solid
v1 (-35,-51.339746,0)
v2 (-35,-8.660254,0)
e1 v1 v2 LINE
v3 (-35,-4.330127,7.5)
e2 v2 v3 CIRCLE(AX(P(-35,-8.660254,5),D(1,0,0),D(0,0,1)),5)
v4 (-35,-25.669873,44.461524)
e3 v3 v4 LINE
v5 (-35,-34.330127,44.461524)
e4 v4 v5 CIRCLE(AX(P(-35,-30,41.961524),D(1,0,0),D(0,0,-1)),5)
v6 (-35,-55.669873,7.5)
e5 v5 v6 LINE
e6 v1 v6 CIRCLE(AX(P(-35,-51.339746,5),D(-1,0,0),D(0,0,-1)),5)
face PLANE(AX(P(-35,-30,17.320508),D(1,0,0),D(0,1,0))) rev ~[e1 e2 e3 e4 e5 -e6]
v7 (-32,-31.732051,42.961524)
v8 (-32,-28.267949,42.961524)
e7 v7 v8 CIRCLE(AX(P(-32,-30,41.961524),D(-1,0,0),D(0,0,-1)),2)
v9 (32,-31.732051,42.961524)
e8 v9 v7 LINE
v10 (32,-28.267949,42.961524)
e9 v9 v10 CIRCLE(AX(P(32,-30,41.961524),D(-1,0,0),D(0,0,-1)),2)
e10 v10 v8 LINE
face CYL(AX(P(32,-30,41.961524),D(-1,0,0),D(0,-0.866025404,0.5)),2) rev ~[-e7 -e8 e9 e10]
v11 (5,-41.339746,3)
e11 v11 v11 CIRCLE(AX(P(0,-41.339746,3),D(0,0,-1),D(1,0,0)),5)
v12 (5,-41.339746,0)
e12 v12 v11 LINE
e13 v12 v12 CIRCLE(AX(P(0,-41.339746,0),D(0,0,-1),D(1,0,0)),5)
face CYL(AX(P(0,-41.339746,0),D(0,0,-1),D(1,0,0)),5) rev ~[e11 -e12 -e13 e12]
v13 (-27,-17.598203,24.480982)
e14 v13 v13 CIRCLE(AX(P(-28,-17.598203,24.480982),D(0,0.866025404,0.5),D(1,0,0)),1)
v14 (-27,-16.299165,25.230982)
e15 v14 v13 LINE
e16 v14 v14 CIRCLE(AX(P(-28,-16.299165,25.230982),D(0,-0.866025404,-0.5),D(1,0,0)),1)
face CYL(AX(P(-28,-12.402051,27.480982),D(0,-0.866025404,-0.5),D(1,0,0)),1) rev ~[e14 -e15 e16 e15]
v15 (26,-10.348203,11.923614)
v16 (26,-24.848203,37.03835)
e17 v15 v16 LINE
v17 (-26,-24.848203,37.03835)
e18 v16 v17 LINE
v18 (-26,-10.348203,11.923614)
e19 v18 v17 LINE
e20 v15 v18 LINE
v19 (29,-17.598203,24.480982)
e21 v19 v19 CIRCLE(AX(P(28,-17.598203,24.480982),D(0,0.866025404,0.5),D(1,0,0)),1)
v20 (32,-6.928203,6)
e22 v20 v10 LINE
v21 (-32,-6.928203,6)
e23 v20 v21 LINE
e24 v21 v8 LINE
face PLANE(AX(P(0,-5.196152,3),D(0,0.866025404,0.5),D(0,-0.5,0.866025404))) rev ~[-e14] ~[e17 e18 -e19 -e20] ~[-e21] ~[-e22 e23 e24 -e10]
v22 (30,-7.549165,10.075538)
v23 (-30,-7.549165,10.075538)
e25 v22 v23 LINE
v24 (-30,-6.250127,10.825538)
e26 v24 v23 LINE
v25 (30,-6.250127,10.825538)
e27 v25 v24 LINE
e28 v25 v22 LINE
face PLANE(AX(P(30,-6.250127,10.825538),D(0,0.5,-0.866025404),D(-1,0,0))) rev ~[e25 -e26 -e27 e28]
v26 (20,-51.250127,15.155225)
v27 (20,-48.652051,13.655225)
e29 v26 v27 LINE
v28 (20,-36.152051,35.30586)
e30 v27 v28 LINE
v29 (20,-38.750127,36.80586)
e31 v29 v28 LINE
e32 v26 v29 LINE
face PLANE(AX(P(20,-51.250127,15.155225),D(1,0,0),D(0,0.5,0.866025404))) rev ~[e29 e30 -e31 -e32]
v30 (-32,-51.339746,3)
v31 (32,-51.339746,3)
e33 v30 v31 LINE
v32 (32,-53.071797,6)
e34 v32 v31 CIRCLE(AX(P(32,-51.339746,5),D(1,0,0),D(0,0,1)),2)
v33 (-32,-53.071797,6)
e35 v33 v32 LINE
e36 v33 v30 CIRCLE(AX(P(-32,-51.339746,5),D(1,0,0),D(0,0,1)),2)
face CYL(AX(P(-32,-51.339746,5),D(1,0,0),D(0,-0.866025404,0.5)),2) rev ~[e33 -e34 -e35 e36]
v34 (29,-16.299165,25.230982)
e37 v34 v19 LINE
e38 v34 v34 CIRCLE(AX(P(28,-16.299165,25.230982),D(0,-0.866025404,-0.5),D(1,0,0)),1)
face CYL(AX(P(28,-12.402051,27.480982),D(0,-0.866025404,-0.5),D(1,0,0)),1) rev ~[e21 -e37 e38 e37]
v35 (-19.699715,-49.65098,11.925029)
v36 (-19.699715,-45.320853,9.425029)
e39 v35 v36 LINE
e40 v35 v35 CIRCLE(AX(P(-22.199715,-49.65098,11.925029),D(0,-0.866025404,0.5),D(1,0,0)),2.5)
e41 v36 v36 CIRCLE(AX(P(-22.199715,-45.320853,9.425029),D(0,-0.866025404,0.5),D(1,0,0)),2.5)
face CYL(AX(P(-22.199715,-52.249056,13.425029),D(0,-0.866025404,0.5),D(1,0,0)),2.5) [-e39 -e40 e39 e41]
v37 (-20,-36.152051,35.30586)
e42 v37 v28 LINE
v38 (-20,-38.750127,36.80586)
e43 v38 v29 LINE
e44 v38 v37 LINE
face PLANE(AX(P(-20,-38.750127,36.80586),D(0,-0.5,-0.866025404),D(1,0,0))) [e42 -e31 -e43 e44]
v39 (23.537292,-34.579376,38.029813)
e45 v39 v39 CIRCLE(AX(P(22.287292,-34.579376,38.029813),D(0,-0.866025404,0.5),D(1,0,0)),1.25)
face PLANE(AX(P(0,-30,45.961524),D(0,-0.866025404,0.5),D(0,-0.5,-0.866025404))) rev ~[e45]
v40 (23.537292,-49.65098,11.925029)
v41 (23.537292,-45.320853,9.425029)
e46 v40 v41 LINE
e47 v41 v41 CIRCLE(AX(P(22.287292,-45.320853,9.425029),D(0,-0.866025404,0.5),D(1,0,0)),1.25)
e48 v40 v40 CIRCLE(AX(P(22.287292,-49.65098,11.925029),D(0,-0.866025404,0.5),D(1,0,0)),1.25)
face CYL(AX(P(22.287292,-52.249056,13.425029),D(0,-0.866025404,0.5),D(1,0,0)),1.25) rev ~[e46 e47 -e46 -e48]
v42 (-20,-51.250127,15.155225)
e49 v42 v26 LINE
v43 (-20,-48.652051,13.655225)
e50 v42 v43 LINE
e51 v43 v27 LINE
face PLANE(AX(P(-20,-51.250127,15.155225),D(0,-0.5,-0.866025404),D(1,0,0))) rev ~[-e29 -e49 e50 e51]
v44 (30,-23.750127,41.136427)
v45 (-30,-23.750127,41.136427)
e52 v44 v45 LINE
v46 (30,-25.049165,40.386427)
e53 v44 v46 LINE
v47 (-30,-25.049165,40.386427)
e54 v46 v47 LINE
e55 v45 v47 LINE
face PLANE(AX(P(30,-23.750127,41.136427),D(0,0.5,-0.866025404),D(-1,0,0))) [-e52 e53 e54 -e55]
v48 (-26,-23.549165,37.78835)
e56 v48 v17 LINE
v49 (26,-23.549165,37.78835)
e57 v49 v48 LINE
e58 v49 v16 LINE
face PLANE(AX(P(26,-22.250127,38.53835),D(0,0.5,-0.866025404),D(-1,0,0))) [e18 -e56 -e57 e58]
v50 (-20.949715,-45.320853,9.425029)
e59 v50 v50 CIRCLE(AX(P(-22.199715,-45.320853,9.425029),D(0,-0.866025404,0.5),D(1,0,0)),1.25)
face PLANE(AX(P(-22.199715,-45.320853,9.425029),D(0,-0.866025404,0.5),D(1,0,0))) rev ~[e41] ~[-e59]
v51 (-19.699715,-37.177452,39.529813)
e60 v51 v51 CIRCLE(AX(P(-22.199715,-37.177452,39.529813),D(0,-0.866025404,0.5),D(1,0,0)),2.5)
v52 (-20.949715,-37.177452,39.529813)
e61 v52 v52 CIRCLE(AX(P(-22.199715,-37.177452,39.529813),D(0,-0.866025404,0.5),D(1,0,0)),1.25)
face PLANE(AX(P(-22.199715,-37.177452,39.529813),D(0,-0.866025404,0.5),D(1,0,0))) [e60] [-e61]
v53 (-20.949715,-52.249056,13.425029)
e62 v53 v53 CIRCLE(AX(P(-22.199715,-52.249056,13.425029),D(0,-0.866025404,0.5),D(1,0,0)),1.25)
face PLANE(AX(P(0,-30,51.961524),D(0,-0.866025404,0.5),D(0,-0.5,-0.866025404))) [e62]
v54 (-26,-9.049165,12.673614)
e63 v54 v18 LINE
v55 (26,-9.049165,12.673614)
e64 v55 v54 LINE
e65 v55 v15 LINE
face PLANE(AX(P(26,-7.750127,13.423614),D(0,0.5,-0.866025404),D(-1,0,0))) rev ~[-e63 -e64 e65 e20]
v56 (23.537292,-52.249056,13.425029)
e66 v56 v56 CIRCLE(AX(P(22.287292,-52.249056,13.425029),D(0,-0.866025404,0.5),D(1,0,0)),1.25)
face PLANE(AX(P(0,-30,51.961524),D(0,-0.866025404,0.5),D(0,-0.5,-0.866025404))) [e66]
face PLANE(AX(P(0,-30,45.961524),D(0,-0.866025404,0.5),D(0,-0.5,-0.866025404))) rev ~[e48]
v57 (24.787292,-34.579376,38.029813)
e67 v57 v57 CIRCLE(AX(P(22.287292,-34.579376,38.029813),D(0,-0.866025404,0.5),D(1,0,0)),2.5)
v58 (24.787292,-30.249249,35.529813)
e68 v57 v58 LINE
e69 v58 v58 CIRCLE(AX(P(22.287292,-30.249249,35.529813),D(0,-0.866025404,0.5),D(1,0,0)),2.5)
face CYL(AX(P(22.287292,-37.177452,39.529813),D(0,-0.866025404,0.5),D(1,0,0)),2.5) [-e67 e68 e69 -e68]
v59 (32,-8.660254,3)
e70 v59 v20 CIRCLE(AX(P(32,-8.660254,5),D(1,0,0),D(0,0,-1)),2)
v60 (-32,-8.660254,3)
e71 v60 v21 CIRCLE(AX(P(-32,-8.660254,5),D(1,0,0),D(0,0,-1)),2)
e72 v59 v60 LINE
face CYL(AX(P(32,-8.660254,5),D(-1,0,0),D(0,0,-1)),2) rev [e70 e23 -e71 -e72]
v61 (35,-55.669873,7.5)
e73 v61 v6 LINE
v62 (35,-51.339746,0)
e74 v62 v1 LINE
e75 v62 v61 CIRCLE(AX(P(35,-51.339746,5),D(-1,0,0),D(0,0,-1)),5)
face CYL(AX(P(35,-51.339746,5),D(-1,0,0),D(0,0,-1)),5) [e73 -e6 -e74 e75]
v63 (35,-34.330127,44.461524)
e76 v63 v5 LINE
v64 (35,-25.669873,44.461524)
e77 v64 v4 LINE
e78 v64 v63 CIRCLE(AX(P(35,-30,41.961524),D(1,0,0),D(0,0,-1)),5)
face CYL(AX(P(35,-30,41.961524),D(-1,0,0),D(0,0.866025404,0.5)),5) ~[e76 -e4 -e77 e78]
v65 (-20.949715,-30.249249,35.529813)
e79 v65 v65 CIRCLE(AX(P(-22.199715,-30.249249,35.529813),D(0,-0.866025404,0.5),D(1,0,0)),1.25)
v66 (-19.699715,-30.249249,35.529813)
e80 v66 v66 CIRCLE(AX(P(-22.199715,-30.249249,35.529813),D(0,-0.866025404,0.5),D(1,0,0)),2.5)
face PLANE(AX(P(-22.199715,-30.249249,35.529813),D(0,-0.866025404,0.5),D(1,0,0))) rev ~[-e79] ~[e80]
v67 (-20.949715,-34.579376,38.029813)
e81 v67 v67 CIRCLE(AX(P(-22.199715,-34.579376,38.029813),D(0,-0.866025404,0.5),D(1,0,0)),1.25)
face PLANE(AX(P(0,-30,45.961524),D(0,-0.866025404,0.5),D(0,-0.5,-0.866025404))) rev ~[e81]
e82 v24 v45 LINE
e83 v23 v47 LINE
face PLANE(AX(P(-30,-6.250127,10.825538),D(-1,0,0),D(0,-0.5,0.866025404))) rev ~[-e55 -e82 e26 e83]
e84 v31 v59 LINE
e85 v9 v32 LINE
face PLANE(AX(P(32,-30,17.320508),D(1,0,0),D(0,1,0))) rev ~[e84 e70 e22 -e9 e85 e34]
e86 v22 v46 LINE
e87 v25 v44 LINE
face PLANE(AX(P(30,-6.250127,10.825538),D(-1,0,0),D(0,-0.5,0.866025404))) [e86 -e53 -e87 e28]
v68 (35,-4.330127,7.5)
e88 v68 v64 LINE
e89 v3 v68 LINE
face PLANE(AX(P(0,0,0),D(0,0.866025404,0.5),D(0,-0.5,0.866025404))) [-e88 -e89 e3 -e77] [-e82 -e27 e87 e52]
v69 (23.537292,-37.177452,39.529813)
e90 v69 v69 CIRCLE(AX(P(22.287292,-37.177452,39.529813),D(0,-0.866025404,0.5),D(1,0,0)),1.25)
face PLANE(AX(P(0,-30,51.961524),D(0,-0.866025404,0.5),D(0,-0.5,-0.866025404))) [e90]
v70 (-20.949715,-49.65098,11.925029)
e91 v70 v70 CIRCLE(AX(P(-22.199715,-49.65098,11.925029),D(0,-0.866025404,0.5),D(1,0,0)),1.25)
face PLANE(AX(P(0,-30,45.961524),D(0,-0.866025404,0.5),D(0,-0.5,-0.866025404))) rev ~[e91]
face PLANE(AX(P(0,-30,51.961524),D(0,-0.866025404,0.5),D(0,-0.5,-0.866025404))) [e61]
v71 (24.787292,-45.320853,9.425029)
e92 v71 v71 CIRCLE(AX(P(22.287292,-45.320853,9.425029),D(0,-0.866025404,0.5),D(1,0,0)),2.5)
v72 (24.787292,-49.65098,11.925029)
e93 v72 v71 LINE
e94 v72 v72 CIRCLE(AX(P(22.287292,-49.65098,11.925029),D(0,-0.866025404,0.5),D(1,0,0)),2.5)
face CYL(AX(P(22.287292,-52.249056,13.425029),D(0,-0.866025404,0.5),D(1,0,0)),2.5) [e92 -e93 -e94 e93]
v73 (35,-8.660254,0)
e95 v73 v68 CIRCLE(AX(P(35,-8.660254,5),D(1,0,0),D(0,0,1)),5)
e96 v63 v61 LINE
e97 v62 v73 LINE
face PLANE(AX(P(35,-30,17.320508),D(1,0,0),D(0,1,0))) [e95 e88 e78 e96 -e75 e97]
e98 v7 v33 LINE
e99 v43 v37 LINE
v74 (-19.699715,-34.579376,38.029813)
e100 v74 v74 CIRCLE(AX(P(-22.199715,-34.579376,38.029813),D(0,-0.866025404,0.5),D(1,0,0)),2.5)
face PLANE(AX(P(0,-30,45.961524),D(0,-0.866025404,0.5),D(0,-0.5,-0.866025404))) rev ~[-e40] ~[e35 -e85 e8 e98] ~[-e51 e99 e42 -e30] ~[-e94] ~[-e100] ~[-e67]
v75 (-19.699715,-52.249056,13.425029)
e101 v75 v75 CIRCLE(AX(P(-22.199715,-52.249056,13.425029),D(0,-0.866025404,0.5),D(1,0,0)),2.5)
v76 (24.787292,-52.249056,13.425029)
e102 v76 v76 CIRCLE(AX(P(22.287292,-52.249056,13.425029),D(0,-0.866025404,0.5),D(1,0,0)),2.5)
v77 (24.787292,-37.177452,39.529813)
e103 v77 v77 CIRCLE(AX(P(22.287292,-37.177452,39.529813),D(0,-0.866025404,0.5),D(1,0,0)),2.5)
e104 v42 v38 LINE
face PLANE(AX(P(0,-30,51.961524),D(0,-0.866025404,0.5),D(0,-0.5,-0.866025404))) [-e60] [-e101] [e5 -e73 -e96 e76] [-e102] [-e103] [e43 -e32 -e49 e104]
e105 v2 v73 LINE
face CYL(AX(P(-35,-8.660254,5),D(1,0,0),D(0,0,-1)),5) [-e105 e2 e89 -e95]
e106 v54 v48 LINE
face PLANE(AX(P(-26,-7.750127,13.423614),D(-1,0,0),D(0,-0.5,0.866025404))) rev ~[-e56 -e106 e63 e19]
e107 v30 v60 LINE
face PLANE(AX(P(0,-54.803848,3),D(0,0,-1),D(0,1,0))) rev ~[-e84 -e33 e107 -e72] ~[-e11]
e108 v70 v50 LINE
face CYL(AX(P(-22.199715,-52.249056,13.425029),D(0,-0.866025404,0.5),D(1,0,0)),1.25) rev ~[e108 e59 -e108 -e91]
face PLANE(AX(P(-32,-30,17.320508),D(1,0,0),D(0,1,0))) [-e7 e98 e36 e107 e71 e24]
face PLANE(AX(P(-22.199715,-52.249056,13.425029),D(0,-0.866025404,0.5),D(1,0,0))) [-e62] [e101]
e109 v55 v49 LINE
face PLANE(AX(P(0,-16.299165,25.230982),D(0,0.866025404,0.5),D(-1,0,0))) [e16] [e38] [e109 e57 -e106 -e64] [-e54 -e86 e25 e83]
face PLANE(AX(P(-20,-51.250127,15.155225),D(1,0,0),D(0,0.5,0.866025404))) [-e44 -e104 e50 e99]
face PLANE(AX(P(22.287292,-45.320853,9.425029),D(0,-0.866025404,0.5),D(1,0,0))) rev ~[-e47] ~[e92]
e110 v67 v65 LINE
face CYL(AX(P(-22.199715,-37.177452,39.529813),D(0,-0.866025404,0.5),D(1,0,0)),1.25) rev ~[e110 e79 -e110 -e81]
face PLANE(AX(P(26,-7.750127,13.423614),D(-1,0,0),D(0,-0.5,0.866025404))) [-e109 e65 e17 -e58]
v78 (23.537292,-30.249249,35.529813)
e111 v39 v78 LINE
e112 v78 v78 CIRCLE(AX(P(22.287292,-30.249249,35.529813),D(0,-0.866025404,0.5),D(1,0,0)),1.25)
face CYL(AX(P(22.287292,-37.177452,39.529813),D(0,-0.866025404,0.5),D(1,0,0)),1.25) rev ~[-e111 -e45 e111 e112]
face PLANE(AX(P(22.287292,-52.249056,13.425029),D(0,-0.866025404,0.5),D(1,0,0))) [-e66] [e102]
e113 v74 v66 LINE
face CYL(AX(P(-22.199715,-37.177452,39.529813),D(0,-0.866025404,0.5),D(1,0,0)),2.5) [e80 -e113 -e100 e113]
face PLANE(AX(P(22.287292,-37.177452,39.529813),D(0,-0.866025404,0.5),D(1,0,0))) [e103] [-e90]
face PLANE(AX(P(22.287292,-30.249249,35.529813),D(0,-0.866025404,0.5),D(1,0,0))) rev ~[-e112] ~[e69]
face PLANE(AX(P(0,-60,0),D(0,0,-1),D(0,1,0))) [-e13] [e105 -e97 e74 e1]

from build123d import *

# Parameters (mm, degrees)
F1_DEPTH  = 35
F2_DEPTH  = 32
F3_R      = 5
F4_R      = 2
F5_W      = 40
F5_H      = 25
F6_DEPTH  = 3
F5_R      = 2.5
F5_R_2    = 1.25
F7_DEPTH  = 8
F8_W      = 52
F8_H      = 29
F9_DEPTH  = 3
F8_W_2    = 60
F8_H_2    = 35
F10_DEPTH = 1.5
F11_R     = 5
F12_DEPTH = 3
F13_D     = 2
F13_DEPTH = 3
F13_TIP   = 0.600860619


with BuildPart() as f1:
    # F0 (on Right) → F1 (new body, symmetric)
    with BuildSketch(Plane.YZ):
        Polygon((-60, 0), (0, 0), (-30, 51.9615242271), align=None)
        Polygon((-5.1961524227, 3), (-54.8038475773, 3), (-30, 45.9615242271), align=None, mode=Mode.SUBTRACT)
        Polygon((-30, 45.9615242271), (-54.8038475773, 3), (-5.1961524227, 3), align=None)
    extrude(amount=F1_DEPTH, both=True)

    # F0 (on Right) → F2 (cut, symmetric)
    with BuildSketch(Plane.YZ):
        Polygon((-30, 45.9615242271), (-54.8038475773, 3), (-5.1961524227, 3), align=None)
    extrude(amount=F2_DEPTH, both=True, mode=Mode.SUBTRACT)

    # F3
    f3_edges = [f1.edges().sort_by_distance(p)[0] for p in [
        (0, -30, 51.961524),
        (0, -60, 0),
        (0, 0, 0),
    ]]
    fillet(f3_edges, radius=F3_R)

    # F4
    f4_edges = [f1.edges().sort_by_distance(p)[0] for p in [
        (0, -30, 45.961524),
        (0, -5.196152, 3),
        (0, -54.803848, 3),
    ]]
    fillet(f4_edges, radius=F4_R)

    # F5 (on face) → F6 (cut)
    with BuildSketch(Plane(origin=(0, -45, 25.9807621135), x_dir=(1, 0, 0), z_dir=(0, -0.8660254038, 0.5))):
        with Locations((0, -0.0002540378)):
            Rectangle(F5_W, F5_H)
    extrude(amount=-F6_DEPTH, mode=Mode.SUBTRACT)

    # F5 (on face) → F7 (join)
    with BuildSketch(Plane(origin=(0, -45, 25.9807621135), x_dir=(1, 0, 0), z_dir=(0, -0.8660254038, 0.5))):
        with Locations((-22.1997145563, 15.6450960785)):
            Circle(F5_R)
        with Locations((-22.1997145563, 15.6450960785)):
            Circle(F5_R_2, mode=Mode.SUBTRACT)
        with Locations((22.287291775, 15.6450960785)):
            Circle(F5_R)
        with Locations((22.287291775, 15.6450960785)):
            Circle(F5_R_2, mode=Mode.SUBTRACT)
        with Locations((22.287291775, -14.4981121665)):
            Circle(F5_R)
        with Locations((22.287291775, -14.4981121665)):
            Circle(F5_R_2, mode=Mode.SUBTRACT)
        with Locations((-22.1997145563, -14.4981121665)):
            Circle(F5_R)
        with Locations((-22.1997145563, -14.4981121665)):
            Circle(F5_R_2, mode=Mode.SUBTRACT)
    extrude(amount=-F7_DEPTH)

    # F8 (on face) → F9 (cut)
    with BuildSketch(Plane(origin=(0, 0, 0), x_dir=(-1, 0, 0), z_dir=(0, 0.8660254038, 0.5))):
        with Locations((0, 30.0002540378)):
            Rectangle(F8_W, F8_H)
    extrude(amount=-F9_DEPTH, mode=Mode.SUBTRACT)

    # F8 (on face) → F10 (cut)
    with BuildSketch(Plane(origin=(0, 0, 0), x_dir=(-1, 0, 0), z_dir=(0, 0.8660254038, 0.5))):
        with Locations((0, 30.0002540378)):
            Rectangle(F8_W_2, F8_H_2)
        with Locations((0, 30.0002540378)):
            Rectangle(F8_W, F8_H, mode=Mode.SUBTRACT)
    extrude(amount=-F10_DEPTH, mode=Mode.SUBTRACT)

    # F11 (on face) → F12 (cut, through all)
    with BuildSketch(Plane(origin=(0, 0, 0), x_dir=(1, 0, 0), z_dir=(0, 0, -1))):
        with Locations((0, 41.3397459622)):
            Circle(F11_R)
    extrude(amount=-F12_DEPTH, mode=Mode.SUBTRACT)

    # F13
    with Locations(Plane(origin=(0, 0, 0), x_dir=(-1, 0, 0), z_dir=(0, 0.8660254038, 0.5))):
        with Locations((-28, 30.0002540378), (28, 30.0002540378)):
            Hole(F13_D / 2, depth=F13_DEPTH)
            with Locations((0, 0, -(F13_DEPTH + F13_TIP / 2))):  # 118° drill point
                Cone(0, F13_D / 2, F13_TIP, mode=Mode.SUBTRACT)


solid = f1.part
